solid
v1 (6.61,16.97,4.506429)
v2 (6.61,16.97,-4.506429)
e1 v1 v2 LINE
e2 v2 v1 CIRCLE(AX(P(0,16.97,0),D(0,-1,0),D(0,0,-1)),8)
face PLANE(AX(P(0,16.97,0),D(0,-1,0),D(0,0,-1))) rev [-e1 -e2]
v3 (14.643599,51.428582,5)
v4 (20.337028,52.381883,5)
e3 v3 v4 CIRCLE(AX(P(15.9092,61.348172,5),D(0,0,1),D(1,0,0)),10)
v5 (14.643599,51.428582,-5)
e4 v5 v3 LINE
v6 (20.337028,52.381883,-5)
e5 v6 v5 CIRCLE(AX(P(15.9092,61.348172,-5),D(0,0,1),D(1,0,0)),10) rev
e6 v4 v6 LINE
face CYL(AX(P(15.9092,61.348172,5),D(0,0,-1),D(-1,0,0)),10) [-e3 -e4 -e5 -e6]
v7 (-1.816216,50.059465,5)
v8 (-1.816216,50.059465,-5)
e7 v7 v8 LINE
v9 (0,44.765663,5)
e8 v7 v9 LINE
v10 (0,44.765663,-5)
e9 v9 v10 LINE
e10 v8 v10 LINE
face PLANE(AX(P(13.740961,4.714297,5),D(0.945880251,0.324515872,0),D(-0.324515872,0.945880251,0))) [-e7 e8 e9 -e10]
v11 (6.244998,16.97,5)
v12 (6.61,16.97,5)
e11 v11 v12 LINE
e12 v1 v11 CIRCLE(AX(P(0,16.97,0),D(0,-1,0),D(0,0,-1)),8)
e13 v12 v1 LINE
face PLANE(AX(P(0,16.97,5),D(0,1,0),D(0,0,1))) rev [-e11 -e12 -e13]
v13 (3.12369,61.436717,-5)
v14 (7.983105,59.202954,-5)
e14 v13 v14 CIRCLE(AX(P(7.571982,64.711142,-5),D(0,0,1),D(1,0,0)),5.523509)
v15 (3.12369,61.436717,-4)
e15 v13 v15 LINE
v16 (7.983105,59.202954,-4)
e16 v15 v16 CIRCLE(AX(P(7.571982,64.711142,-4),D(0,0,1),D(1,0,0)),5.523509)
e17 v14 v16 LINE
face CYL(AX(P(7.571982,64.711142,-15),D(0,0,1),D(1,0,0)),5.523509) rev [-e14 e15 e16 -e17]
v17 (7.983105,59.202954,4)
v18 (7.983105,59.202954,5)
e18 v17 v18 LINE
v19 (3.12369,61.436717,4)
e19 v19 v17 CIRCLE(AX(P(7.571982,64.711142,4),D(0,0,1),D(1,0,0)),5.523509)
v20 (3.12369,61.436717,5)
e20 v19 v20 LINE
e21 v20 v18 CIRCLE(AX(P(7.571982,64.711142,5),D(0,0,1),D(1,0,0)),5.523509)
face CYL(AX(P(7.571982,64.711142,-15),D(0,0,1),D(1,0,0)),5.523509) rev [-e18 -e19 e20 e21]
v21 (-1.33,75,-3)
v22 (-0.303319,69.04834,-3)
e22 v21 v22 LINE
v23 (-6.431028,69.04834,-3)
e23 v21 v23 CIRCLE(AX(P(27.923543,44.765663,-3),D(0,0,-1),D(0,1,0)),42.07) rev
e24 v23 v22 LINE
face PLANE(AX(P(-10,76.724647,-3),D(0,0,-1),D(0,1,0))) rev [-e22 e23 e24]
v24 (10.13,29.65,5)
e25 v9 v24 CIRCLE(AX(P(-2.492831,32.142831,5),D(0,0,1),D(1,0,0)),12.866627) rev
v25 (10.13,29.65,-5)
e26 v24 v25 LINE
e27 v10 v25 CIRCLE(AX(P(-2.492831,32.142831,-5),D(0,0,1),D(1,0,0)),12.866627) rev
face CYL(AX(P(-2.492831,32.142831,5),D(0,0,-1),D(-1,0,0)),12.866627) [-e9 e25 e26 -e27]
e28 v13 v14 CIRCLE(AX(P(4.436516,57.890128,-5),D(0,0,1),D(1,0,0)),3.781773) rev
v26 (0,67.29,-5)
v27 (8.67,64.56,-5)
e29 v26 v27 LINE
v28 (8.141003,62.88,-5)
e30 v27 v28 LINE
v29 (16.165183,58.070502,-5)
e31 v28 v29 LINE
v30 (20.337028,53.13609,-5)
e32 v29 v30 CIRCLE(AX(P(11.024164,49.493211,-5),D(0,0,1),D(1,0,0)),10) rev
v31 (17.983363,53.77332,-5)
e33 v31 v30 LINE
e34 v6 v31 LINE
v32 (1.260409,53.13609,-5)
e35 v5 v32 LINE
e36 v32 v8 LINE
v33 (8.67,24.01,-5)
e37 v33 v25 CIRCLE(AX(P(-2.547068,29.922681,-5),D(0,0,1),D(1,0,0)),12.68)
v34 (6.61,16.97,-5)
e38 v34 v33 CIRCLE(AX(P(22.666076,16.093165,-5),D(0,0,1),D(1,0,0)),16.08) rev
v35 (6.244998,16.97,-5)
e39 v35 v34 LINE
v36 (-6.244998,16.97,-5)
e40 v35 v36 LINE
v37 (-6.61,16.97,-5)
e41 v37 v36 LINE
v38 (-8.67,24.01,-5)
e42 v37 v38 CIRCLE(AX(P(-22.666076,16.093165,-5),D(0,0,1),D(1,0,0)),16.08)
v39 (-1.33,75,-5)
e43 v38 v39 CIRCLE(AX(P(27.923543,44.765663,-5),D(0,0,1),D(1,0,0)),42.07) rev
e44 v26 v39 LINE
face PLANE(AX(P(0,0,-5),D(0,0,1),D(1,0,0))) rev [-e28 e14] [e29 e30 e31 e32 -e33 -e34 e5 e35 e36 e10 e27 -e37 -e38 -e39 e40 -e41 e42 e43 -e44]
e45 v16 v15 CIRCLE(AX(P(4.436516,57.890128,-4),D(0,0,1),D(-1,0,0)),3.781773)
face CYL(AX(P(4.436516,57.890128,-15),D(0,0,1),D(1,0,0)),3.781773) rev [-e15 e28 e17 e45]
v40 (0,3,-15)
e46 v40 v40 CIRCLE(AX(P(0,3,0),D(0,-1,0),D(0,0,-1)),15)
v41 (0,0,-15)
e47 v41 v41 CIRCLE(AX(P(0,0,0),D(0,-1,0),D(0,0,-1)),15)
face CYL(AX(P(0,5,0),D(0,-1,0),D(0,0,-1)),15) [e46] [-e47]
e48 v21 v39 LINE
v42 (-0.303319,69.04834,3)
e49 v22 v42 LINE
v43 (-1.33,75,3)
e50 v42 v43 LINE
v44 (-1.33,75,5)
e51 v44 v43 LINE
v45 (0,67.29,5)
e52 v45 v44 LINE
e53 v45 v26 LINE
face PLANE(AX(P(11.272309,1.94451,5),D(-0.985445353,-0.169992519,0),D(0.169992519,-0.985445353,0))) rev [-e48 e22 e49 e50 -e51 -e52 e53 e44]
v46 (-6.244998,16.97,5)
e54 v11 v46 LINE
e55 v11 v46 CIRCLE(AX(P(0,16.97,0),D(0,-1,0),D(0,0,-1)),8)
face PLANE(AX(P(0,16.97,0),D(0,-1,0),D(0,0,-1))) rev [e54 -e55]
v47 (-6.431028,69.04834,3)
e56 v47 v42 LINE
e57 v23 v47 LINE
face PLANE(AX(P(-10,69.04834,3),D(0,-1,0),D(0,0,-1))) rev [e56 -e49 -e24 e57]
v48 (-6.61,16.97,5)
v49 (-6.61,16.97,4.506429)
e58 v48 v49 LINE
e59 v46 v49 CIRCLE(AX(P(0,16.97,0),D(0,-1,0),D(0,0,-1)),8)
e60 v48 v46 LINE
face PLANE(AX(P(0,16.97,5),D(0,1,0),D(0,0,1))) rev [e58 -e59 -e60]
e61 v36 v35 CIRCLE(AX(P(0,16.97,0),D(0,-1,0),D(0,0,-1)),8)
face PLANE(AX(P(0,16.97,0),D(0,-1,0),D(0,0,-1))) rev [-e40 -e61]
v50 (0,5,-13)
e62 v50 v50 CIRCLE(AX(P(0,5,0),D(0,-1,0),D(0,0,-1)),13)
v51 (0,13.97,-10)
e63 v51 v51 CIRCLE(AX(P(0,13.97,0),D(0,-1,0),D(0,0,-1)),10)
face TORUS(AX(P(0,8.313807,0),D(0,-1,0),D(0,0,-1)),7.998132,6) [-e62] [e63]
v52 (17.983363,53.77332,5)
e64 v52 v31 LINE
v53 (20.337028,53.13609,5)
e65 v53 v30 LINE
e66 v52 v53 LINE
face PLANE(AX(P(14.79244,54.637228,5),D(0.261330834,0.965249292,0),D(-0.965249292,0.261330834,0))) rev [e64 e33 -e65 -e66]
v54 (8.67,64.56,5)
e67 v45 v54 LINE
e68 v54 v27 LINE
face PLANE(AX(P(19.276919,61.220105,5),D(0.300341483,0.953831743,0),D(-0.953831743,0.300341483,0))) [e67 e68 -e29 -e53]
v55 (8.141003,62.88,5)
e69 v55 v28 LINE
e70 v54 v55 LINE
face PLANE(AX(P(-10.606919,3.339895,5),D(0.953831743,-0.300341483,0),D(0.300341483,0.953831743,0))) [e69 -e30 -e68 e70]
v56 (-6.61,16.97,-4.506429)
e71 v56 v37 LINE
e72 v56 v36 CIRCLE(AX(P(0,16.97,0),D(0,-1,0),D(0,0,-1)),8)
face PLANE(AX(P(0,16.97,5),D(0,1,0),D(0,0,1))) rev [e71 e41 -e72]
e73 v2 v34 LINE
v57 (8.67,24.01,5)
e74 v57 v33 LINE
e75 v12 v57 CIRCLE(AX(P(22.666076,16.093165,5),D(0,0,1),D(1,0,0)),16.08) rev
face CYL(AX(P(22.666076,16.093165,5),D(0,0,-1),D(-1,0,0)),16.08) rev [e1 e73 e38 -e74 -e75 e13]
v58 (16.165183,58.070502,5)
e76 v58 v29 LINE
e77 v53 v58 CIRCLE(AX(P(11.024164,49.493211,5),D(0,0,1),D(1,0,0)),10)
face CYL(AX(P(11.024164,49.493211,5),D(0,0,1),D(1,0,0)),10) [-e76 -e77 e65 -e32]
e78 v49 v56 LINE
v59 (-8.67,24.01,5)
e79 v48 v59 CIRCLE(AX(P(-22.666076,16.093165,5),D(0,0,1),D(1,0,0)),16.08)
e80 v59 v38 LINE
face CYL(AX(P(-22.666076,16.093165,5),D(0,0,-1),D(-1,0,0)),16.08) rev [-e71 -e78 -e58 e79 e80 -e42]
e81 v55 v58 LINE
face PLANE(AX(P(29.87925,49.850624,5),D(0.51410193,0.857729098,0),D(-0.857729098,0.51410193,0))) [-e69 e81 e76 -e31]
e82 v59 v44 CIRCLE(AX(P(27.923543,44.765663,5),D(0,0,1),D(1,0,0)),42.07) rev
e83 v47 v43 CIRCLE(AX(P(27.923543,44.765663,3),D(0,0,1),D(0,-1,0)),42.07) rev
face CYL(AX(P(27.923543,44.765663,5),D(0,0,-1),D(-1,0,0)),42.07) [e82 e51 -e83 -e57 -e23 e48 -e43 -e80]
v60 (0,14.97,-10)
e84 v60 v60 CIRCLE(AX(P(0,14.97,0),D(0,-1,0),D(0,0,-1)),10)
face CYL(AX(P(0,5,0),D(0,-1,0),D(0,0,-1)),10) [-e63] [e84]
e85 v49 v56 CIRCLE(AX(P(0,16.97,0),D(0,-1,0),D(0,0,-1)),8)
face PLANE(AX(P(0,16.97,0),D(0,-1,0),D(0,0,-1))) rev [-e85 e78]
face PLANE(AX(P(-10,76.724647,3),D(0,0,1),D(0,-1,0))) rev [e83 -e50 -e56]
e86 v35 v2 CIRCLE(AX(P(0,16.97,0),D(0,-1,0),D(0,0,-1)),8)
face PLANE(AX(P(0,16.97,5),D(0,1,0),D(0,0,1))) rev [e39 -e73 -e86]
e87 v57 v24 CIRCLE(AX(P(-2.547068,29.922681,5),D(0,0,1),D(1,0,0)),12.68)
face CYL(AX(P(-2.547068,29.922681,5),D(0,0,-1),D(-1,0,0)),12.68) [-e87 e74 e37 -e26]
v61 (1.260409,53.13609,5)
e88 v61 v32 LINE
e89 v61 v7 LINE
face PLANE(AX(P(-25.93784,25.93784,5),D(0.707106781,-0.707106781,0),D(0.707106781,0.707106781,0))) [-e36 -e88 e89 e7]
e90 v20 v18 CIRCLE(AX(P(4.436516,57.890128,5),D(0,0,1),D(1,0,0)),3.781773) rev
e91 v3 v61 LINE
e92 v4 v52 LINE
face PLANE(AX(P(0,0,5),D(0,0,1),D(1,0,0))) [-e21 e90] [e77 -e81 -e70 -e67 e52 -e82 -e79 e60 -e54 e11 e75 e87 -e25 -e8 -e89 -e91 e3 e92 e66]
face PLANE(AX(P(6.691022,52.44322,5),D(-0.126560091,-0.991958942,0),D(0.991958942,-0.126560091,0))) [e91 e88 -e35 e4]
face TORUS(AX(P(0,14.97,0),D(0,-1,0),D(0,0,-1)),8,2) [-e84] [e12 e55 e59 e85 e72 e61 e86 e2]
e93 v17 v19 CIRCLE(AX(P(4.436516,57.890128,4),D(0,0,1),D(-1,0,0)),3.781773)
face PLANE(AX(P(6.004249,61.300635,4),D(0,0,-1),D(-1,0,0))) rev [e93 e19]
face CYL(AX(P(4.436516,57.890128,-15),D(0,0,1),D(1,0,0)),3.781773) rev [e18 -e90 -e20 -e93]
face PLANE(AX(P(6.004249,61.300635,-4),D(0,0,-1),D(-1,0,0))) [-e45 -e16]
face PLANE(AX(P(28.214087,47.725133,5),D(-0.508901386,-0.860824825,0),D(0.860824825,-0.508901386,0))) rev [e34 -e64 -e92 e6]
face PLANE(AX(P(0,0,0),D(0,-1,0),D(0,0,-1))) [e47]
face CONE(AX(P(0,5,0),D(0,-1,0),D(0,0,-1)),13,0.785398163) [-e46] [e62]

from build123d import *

# Parameters (mm, degrees)
SKETCH2_W               = 15
SKETCH2_H               = 3
BOSS_EXTRUDE1_DEPTH     = 5
SKETCH4_W               = 6
SKETCH4_H               = 7.676307803
CUT_EXTRUDE1_DEPTH      = 10
FILLET2_R               = 10
FILLET3_R               = 10
CUT_EXTRUDE2_DEPTH      = 80.142875261
CUT_EXTRUDE2_DEPTH_BACK = 80.142875261
BOSS_EXTRUDE2_DEPTH     = 4


with BuildPart() as part:
    # Sketch2 → Revolve1 (revolve)
    with BuildSketch(Plane.XY, mode=Mode.PRIVATE) as revolve1_sk:
        with BuildLine():
            ThreePointArc((-10, 14.97), (-9.414213562, 16.384213562), (-8, 16.97))
            Line((-8, 16.97), (0, 16.97))
            Line((0, 16.97), (0, 14.97))
            Line((0, 14.97), (0, 13.97))
            Line((0, 13.97), (0, 5))
            Line((0, 5), (0, 3))
            Line((0, 3), (-15, 3))
            Line((-15, 3), (-13, 5))
            ThreePointArc((-13, 5), (-13.688325627, 10.216881481), (-10, 13.97))
            Line((-10, 13.97), (-10, 14.97))
        make_face()
        with Locations((-7.5, 1.5)):
            Rectangle(SKETCH2_W, SKETCH2_H)
    revolve(revolve1_sk.sketch.rotate(Axis((0, 5, 0), (0, 1, 0)), 270), axis=Axis((0, 5, 0), (0, 1, 0)))

    # Sketch3 → Boss-Extrude1 (add, symmetric)
    with BuildSketch(Plane.XY):
        with BuildLine():
            ThreePointArc((0, 44.765662821), (8.195556272, 39.305823104), (10.13, 29.65))
            ThreePointArc((10.13, 29.65), (9.728307106, 26.745012699), (8.67, 24.01))
            ThreePointArc((8.67, 24.01), (7.233209761, 20.609032371), (6.61, 16.97))
            Line((6.61, 16.97), (-6.61, 16.97))
            ThreePointArc((-6.61, 16.97), (-7.233209761, 20.609032371), (-8.67, 24.01))
            ThreePointArc((-8.67, 24.01), (-13.717238878, 50.759844741), (-1.33, 75))
            Line((-1.33, 75), (0, 67.29))
            Line((0, 67.29), (8.67, 64.56))
            Line((8.67, 64.56), (8.14100346, 62.88))
            Line((8.14100346, 62.88), (20.337027919, 55.57))
            Line((20.337027919, 55.57), (20.337027919, 53.136090211))
            Line((20.337027919, 53.136090211), (17.983362656, 53.773319693))
            Line((17.983362656, 53.773319693), (20.337027919, 52.381882691))
            Line((20.337027919, 52.381882691), (20.337027919, 50.702180422))
            Line((20.337027919, 50.702180422), (1.260409295, 53.136090211))
            Line((1.260409295, 53.136090211), (-1.816215968, 50.059464948))
            Line((-1.816215968, 50.059464948), (0, 44.765662821))
        make_face()
    extrude(amount=BOSS_EXTRUDE1_DEPTH, both=True)

    # Sketch4 → Cut-Extrude1 (cut)
    with BuildSketch(Plane(origin=(0, 0, 0), x_dir=(0, 0, -1), z_dir=(1, 0, 0))):
        with Locations((0, 72.886493521)):
            Rectangle(SKETCH4_W, SKETCH4_H)
    extrude(amount=-CUT_EXTRUDE1_DEPTH, mode=Mode.SUBTRACT)

    # Fillet2
    # the kernel refuses this fillet: 10 mm, written as the material it takes off along each edge
    with BuildSketch(Plane(origin=(20.337027919, 55.57, 17.159563067), x_dir=(-0.8577290982340794, 0.5141019296234484, 0), z_dir=(0, 0, -1))) as fillet2_piece_1:
        with BuildLine():
            CenterArc((4.863825227, -10), FILLET2_R, 90, 37.698787392)
            Line((-1.251277719, -2.087635248), (-1.373579778, -1.929387953))
            ThreePointArc((-1.373579778, -1.929387953), (-0.797184679, -0.940997238), (-0.17154582, 0.102820386))
            Line((-0.17154582, 0.102820386), (0, 0.2))
            Line((0, 0.2), (4.863825227, 0.2))
            Line((4.863825227, 0.2), (4.863825227, 0))
        make_face()
    extrude(amount=34.319126134, mode=Mode.SUBTRACT)

    # Fillet3
    # the kernel refuses this fillet: 10 mm, written as the material it takes off along each edge
    with BuildSketch(Plane(origin=(20.337027919, 50.702180422, 19.348952899), x_dir=(-0.9919589424380495, 0.12656009053878878, 0), z_dir=(0, 0, -1))) as fillet3_piece_1:
        with BuildLine():
            CenterArc((5.73958116, 10), FILLET3_R, 236.447572357, 33.552427643)
            Line((0.212583271, 1.666195686), (0.102043313, 1.4995196))
            ThreePointArc((0.102043313, 1.4995196), (-0.092100153, 0.858409861), (-0.198391788, 0.025312018))
            Line((-0.198391788, 0.025312018), (0, -0.2))
            Line((0, -0.2), (5.73958116, -0.2))
            Line((5.73958116, -0.2), (5.73958116, 0))
        make_face()
    extrude(amount=38.697905798, mode=Mode.SUBTRACT)

    # Sketch5 → Cut-Extrude2 (cut, two sides: drawn at the far end of the back side and taken through both)
    with BuildSketch(Plane.XY.offset(-CUT_EXTRUDE2_DEPTH_BACK)):
        with BuildLine():
            ThreePointArc((3.123689943, 61.436717182), (5.265012371, 59.692471778), (7.983104726, 59.202953935))
            ThreePointArc((7.983104726, 59.202953935), (6.01602485, 61.326253313), (3.123689943, 61.436717182))
        make_face()
    extrude(amount=CUT_EXTRUDE2_DEPTH + CUT_EXTRUDE2_DEPTH_BACK, mode=Mode.SUBTRACT)

    # Sketch5<3> → Boss-Extrude2 (add, symmetric)
    with BuildSketch(Plane.XY):
        with BuildLine():
            ThreePointArc((3.123689943, 61.436717182), (5.265012371, 59.692471778), (7.983104726, 59.202953935))
            ThreePointArc((7.983104726, 59.202953935), (6.01602485, 61.326253313), (3.123689943, 61.436717182))
        make_face()
    extrude(amount=BOSS_EXTRUDE2_DEPTH, both=True)


solid = part.part
